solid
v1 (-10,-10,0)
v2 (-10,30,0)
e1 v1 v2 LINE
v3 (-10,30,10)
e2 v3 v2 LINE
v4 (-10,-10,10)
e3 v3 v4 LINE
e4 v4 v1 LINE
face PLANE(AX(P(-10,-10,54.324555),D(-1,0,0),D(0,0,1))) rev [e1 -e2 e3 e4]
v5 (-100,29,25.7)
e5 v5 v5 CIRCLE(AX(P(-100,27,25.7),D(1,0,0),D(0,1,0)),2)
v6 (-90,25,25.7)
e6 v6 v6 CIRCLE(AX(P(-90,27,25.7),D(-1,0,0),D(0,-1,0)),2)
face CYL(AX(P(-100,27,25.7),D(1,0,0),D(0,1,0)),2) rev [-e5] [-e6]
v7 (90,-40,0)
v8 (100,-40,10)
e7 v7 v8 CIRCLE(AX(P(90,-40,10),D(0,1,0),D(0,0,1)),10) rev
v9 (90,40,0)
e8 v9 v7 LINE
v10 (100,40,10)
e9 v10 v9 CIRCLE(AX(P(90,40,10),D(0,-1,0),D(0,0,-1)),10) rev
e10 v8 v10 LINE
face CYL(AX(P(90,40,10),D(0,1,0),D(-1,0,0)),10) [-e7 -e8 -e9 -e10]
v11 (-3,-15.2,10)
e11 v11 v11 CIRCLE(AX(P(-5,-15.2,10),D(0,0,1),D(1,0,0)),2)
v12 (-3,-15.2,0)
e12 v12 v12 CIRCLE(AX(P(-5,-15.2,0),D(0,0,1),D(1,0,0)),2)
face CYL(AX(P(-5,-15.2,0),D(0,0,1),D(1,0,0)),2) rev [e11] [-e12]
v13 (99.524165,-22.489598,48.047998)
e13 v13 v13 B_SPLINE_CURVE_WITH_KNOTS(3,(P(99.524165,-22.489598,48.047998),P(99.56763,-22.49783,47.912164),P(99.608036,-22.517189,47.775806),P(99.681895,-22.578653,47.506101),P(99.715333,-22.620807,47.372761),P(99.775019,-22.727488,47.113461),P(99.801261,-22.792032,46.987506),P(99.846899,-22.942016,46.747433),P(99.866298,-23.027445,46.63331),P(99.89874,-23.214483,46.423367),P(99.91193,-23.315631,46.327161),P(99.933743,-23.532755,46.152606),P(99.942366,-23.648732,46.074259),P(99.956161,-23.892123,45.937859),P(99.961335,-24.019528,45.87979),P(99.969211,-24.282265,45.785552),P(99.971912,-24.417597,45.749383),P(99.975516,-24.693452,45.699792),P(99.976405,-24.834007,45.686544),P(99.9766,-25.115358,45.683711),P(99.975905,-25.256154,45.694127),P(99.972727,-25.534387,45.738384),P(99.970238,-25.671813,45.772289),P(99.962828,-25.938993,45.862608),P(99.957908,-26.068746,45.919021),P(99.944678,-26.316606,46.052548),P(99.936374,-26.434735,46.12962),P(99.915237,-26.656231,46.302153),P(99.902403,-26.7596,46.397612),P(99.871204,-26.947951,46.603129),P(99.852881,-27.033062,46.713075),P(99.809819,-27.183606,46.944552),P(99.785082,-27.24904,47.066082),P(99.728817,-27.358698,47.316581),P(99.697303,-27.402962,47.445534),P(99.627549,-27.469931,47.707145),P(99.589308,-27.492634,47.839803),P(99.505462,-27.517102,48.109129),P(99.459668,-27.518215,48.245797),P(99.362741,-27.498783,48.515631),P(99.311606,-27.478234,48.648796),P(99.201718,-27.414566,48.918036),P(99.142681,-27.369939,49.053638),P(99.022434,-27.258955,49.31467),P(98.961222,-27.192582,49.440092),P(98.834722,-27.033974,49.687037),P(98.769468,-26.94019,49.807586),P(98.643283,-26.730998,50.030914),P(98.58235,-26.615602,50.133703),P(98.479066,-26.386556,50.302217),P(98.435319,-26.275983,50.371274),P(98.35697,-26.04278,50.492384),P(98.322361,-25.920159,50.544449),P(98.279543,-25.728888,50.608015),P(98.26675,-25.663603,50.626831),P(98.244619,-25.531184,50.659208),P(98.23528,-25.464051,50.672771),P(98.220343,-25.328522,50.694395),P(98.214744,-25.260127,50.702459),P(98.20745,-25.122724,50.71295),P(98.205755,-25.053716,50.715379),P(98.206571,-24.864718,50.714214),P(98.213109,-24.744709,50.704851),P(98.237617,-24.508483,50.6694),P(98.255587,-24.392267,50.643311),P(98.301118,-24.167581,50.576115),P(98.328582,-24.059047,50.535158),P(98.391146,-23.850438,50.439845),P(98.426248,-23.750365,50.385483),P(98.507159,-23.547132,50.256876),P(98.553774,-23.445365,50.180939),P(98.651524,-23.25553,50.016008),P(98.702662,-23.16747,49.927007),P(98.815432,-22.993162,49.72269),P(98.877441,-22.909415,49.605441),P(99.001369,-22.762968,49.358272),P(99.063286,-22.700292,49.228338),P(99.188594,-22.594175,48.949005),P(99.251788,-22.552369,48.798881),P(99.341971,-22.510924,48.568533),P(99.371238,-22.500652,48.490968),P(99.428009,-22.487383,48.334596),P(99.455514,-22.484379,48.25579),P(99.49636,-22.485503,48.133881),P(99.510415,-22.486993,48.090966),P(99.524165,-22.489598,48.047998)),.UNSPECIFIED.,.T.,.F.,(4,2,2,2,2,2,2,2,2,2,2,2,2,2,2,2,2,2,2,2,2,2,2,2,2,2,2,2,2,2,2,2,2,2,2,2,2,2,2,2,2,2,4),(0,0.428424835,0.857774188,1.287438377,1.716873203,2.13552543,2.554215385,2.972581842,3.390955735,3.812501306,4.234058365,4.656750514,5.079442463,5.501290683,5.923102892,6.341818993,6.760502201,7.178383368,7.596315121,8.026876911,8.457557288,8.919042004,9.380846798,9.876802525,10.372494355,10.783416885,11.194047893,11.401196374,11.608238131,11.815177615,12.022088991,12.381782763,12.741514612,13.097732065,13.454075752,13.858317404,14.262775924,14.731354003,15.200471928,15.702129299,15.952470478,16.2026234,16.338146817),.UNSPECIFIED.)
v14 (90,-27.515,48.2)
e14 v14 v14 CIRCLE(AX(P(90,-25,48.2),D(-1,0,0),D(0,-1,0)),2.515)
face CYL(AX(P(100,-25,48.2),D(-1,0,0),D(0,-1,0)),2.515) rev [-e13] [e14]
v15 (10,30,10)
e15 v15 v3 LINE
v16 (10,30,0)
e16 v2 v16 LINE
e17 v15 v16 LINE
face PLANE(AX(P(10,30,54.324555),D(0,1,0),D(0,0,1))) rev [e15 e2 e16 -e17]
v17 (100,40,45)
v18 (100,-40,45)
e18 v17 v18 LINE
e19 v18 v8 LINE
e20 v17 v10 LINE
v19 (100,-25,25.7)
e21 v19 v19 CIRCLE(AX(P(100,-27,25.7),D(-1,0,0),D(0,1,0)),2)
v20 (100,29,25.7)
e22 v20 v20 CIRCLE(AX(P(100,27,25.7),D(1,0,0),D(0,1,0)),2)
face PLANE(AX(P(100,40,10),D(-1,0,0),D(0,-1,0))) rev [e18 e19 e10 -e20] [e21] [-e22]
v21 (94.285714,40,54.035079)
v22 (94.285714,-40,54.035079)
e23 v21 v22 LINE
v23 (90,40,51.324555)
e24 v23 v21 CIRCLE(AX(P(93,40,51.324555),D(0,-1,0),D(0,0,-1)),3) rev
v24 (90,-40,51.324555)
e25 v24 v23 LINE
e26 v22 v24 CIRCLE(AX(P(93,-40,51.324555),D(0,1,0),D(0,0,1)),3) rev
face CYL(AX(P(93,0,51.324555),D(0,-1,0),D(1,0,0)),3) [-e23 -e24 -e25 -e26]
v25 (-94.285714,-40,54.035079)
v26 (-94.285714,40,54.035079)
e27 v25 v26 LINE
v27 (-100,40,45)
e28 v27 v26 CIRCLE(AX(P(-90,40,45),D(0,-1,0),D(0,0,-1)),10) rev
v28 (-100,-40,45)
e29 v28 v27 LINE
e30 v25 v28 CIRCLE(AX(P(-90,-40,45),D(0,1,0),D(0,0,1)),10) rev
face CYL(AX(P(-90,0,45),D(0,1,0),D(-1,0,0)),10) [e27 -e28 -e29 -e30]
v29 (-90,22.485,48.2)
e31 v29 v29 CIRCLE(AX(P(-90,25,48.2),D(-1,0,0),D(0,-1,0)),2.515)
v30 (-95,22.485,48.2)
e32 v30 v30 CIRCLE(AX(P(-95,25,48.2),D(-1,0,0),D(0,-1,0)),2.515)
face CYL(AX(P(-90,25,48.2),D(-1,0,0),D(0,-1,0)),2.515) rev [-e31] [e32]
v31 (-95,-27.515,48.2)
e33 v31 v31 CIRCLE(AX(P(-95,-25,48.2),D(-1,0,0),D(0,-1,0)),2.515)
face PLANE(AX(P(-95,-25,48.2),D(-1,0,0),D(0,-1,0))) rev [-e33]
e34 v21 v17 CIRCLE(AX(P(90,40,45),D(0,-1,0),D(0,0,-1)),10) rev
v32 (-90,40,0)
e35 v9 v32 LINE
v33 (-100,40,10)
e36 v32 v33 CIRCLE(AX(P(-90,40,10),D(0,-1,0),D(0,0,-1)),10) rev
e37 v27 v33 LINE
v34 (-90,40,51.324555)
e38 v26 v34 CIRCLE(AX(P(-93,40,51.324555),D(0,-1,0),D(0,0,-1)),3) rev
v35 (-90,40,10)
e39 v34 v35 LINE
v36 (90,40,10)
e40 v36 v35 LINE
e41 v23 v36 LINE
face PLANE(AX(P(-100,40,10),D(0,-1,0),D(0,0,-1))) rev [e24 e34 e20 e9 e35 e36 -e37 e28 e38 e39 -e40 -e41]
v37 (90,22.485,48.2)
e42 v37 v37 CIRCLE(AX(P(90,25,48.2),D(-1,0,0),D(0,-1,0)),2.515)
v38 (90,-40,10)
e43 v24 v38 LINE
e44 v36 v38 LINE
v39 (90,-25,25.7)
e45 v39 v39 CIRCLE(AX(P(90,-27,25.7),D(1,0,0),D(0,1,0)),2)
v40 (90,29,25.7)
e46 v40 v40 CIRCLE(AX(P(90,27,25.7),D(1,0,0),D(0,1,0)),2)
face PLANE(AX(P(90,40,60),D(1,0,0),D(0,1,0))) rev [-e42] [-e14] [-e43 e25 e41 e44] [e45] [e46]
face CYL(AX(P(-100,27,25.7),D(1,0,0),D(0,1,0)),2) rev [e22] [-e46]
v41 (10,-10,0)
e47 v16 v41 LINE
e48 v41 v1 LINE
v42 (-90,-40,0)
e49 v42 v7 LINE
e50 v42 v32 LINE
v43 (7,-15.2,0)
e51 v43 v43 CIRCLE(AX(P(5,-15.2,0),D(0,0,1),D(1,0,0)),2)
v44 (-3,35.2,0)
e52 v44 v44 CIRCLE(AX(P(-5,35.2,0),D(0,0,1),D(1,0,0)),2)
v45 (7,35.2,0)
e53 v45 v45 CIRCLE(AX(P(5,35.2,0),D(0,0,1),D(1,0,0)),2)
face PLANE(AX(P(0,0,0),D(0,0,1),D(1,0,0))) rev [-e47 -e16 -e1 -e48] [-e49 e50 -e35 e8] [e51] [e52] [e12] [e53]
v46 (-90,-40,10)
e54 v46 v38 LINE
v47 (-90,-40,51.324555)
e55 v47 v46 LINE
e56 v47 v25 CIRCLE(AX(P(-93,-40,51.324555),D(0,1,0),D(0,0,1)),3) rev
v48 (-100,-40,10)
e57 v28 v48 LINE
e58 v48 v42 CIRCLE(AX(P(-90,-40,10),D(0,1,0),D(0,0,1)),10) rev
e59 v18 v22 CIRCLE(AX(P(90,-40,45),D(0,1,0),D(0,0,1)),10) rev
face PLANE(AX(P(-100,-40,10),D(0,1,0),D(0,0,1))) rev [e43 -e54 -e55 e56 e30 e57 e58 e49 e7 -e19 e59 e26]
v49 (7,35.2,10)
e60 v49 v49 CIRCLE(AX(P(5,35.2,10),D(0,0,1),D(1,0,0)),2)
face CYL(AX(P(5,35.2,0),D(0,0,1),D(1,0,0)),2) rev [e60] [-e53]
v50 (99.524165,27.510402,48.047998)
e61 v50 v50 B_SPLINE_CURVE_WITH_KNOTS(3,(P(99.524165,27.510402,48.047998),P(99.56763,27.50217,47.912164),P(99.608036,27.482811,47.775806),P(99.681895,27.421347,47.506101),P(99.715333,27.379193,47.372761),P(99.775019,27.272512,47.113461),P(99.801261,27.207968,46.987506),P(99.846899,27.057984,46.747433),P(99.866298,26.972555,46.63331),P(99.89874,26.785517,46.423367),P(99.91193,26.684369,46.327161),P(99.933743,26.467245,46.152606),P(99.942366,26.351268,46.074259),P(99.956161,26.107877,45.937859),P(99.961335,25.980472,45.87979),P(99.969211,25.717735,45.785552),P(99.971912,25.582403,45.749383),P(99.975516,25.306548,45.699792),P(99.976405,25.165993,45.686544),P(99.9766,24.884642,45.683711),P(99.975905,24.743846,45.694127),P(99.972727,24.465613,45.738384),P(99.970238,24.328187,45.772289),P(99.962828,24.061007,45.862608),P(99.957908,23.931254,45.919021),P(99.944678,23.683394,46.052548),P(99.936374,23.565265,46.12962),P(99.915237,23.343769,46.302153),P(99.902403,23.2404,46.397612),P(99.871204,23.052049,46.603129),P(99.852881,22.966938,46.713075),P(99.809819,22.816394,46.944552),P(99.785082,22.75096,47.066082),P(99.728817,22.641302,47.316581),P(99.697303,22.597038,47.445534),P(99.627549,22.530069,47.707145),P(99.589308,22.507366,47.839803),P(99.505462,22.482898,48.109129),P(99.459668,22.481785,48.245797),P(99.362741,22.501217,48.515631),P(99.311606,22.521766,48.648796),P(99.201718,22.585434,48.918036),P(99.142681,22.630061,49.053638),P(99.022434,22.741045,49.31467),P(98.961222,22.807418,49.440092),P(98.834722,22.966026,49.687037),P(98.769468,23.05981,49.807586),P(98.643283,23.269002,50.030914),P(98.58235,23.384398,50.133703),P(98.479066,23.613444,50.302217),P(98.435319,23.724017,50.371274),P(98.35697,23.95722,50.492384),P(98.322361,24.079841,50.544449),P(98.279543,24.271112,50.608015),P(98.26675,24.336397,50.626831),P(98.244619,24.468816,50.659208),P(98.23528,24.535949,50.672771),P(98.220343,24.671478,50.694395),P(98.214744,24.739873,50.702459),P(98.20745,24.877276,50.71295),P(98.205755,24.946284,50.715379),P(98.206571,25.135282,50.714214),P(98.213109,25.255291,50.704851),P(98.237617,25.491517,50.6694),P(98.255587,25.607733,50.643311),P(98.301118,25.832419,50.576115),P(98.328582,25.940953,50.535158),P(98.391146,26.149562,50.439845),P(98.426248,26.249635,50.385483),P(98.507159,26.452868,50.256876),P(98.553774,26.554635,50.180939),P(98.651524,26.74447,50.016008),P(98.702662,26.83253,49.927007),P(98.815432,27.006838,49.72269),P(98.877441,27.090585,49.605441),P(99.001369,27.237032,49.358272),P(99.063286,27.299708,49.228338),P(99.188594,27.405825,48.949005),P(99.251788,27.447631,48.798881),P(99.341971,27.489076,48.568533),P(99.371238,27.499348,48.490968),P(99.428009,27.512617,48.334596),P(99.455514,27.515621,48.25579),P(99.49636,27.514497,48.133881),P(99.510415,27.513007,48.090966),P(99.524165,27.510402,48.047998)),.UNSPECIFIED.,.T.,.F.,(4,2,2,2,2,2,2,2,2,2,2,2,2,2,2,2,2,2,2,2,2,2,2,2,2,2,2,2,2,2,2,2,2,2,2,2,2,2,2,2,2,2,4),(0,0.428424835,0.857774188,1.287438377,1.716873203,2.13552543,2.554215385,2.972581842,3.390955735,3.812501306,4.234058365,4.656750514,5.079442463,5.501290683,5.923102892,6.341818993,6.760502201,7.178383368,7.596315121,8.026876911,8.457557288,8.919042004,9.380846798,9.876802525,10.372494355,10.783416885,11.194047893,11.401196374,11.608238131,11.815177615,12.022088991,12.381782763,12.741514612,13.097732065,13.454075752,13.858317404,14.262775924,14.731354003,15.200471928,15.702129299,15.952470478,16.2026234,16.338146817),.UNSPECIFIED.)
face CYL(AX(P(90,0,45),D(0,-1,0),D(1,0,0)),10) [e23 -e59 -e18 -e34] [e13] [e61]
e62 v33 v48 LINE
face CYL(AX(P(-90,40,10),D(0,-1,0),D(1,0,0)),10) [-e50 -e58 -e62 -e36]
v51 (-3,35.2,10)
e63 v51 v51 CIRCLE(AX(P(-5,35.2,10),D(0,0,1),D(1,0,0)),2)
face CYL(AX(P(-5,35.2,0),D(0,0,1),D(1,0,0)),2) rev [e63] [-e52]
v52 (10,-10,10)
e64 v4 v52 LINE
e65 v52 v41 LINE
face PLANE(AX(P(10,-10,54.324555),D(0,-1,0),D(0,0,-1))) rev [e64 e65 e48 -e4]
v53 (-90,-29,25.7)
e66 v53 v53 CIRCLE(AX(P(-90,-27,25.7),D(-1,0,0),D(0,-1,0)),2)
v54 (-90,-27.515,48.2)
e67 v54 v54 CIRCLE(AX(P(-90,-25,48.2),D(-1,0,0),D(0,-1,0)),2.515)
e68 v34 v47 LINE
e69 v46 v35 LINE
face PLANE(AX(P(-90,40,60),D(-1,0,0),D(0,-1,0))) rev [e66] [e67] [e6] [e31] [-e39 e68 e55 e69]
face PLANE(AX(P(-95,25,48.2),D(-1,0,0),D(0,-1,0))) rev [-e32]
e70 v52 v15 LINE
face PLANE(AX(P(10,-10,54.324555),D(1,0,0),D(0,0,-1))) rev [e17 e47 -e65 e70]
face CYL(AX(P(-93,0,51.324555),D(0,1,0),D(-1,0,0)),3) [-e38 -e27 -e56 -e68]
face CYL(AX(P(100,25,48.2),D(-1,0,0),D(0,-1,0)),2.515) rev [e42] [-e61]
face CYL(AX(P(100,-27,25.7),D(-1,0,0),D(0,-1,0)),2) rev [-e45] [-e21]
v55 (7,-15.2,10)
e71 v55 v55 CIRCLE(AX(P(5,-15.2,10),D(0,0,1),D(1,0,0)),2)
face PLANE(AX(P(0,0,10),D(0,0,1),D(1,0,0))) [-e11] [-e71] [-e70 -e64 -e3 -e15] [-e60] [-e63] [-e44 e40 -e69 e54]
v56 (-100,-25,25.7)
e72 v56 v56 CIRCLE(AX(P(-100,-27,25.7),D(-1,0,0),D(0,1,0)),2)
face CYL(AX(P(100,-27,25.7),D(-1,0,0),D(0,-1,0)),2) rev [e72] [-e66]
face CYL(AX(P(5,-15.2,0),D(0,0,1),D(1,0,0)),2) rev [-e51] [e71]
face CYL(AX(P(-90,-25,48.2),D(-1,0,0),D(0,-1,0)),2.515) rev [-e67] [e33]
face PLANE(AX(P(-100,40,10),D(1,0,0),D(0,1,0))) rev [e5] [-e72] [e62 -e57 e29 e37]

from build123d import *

# Parameters (mm, degrees)
ESQUISSE1_W             = 200
ESQUISSE1_H             = 80
BOSS_EXTRU_1_DEPTH      = 10
ESQUISSE2_W             = 10
ESQUISSE2_H             = 80
BOSS_EXTRU_2_DEPTH      = 50
ESQUISSE8_R             = 2
ENL_V_MAT_EXTRU_3_DEPTH = 213.602916255
ESQUISSE9_W             = 10
ESQUISSE9_H             = 80
ENL_V_MAT_EXTRU_4_DEPTH = 5
ESQUISSE10_R            = 2.515
ENL_V_MAT_EXTRU_5_DEPTH = 202.804360706
ENL_V_START             = -5
ESQUISSE11_R            = 2.515
ENL_V_MAT_EXTRU_6_DEPTH = 5
CONG_1_R                = 10
CONG_2_START            = -41
CONG_2_DEPTH            = 82
CONG_3_R                = 3
ESQUISSE12_W            = 20
ESQUISSE12_H            = 40
ENL_V_MAT_EXTRU_7_DEPTH = 121.628178046
ESQUISSE13_R            = 2
ENL_V_MAT_EXTRU_8_DEPTH = 117.467447093
ESQUISSE14_R            = 2
ENL_V_MAT_EXTRU_9_DEPTH = 212.071450838


with BuildPart() as part:
    # Esquisse1 → Boss.-Extru.1 (new body)
    with BuildSketch(Plane.XY):
        Rectangle(ESQUISSE1_W, ESQUISSE1_H)
    extrude(amount=BOSS_EXTRU_1_DEPTH)

    # Esquisse2 → Boss.-Extru.2 (add)
    with BuildSketch(Plane.XY.offset(10)):
        with Locations((-95, 0)):
            Rectangle(ESQUISSE2_W, ESQUISSE2_H)
        with Locations((95, 0)):
            Rectangle(ESQUISSE2_W, ESQUISSE2_H)
    extrude(amount=BOSS_EXTRU_2_DEPTH)

    # Esquisse8 → Enlèv. mat.-Extru.3 (cut, through all)
    with BuildSketch(Plane(origin=(100, 0, 0), x_dir=(0, 0, -1), z_dir=(1, 0, 0))):
        with Locations(Location((-25.7, 27, 0), (0, 0, 90))):
            Circle(ESQUISSE8_R)
    extrude(amount=-ENL_V_MAT_EXTRU_3_DEPTH, mode=Mode.SUBTRACT)

    # Esquisse9 → Enlèv. mat.-Extru.4 (cut)
    with BuildSketch(Plane.XY.offset(60)):
        with Locations((-95, 0)):
            Rectangle(ESQUISSE9_W, ESQUISSE9_H)
        with Locations((95, 0)):
            Rectangle(ESQUISSE9_W, ESQUISSE9_H)
    extrude(amount=-ENL_V_MAT_EXTRU_4_DEPTH, mode=Mode.SUBTRACT)

    # Esquisse10 → Enlèv. mat.-Extru.5 (cut, through all)
    with BuildSketch(Plane.ZY.offset(-90)):
        with Locations(Location((48.2, 25, 0), (0, 0, 270))):
            Circle(ESQUISSE10_R)
        with Locations(Location((48.2, -25, 0), (0, 0, 270))):
            Circle(ESQUISSE10_R)
    extrude(amount=-ENL_V_MAT_EXTRU_5_DEPTH, mode=Mode.SUBTRACT)

    # Esquisse11 → Enlèv. mat.-Extru.6 (cut)
    with BuildSketch(Plane.ZY.offset(100).offset(ENL_V_START)):
        with Locations(Location((48.2, 25, 0), (0, 0, 270))):
            Circle(ESQUISSE11_R)
        with Locations(Location((48.2, -25, 0), (0, 0, 270))):
            Circle(ESQUISSE11_R)
    extrude(amount=-ENL_V_MAT_EXTRU_6_DEPTH, mode=Mode.SUBTRACT)

    # Congé1
    cong_1_edges = [part.edges().sort_by_distance(p)[0] for p in [
        (-100, 0, 0),
        (100, 0, 0),
    ]]
    fillet(cong_1_edges, radius=CONG_1_R)

    # Congé2: read off the stored shape, not the designer's step
    # Congé2 outline → Congé2 (cut)
    with BuildSketch(Plane(origin=(0, 0, 0), x_dir=(1, 0, 0), z_dir=(0, 1, 0)).offset(CONG_2_START)):
        with BuildLine():
            Line((100, -55), (100, -45))
            ThreePointArc((100, -45), (97.071067812, -52.071067812), (90, -55))
            Line((90, -55), (100, -55))
        make_face()
        with BuildLine():
            ThreePointArc((-90, -55), (-97.071067812, -52.071067812), (-100, -45))
            Line((-100, -45), (-100, -55))
            Line((-100, -55), (-90, -55))
        make_face()
    extrude(amount=CONG_2_DEPTH, mode=Mode.SUBTRACT)

    # Congé3
    cong_3_edges = [part.edges().sort_by_distance(p)[0] for p in [
        (-90, 0, 55),
        (90, 0, 55),
    ]]
    fillet(cong_3_edges, radius=CONG_3_R)

    # Esquisse12 → Enlèv. mat.-Extru.7 (cut, through all)
    with BuildSketch(Plane(origin=(0, 0, 0), x_dir=(-1, 0, 0), z_dir=(0, 0, -1))):
        with Locations((0, 10)):
            Rectangle(ESQUISSE12_W, ESQUISSE12_H)
    extrude(amount=-ENL_V_MAT_EXTRU_7_DEPTH, mode=Mode.SUBTRACT)

    # Esquisse13 → Enlèv. mat.-Extru.8 (cut, through all)
    with BuildSketch(Plane.XY.offset(10)):
        with Locations((-5, 35.2)):
            Circle(ESQUISSE13_R)
        with Locations((5, 35.2)):
            Circle(ESQUISSE13_R)
        with Locations((-5, -15.2)):
            Circle(ESQUISSE13_R)
        with Locations((5, -15.2)):
            Circle(ESQUISSE13_R)
    extrude(amount=-ENL_V_MAT_EXTRU_8_DEPTH, mode=Mode.SUBTRACT)

    # Esquisse14 → Enlèv. mat.-Extru.9 (cut, through all)
    with BuildSketch(Plane.ZY.offset(100)):
        with Locations(Location((25.7, 27, 0), (0, 0, 90))):
            Circle(ESQUISSE14_R)
        with Locations(Location((25.7, -27, 0), (0, 0, 270))):
            Circle(ESQUISSE14_R)
    extrude(amount=-ENL_V_MAT_EXTRU_9_DEPTH, mode=Mode.SUBTRACT)


solid = part.part
